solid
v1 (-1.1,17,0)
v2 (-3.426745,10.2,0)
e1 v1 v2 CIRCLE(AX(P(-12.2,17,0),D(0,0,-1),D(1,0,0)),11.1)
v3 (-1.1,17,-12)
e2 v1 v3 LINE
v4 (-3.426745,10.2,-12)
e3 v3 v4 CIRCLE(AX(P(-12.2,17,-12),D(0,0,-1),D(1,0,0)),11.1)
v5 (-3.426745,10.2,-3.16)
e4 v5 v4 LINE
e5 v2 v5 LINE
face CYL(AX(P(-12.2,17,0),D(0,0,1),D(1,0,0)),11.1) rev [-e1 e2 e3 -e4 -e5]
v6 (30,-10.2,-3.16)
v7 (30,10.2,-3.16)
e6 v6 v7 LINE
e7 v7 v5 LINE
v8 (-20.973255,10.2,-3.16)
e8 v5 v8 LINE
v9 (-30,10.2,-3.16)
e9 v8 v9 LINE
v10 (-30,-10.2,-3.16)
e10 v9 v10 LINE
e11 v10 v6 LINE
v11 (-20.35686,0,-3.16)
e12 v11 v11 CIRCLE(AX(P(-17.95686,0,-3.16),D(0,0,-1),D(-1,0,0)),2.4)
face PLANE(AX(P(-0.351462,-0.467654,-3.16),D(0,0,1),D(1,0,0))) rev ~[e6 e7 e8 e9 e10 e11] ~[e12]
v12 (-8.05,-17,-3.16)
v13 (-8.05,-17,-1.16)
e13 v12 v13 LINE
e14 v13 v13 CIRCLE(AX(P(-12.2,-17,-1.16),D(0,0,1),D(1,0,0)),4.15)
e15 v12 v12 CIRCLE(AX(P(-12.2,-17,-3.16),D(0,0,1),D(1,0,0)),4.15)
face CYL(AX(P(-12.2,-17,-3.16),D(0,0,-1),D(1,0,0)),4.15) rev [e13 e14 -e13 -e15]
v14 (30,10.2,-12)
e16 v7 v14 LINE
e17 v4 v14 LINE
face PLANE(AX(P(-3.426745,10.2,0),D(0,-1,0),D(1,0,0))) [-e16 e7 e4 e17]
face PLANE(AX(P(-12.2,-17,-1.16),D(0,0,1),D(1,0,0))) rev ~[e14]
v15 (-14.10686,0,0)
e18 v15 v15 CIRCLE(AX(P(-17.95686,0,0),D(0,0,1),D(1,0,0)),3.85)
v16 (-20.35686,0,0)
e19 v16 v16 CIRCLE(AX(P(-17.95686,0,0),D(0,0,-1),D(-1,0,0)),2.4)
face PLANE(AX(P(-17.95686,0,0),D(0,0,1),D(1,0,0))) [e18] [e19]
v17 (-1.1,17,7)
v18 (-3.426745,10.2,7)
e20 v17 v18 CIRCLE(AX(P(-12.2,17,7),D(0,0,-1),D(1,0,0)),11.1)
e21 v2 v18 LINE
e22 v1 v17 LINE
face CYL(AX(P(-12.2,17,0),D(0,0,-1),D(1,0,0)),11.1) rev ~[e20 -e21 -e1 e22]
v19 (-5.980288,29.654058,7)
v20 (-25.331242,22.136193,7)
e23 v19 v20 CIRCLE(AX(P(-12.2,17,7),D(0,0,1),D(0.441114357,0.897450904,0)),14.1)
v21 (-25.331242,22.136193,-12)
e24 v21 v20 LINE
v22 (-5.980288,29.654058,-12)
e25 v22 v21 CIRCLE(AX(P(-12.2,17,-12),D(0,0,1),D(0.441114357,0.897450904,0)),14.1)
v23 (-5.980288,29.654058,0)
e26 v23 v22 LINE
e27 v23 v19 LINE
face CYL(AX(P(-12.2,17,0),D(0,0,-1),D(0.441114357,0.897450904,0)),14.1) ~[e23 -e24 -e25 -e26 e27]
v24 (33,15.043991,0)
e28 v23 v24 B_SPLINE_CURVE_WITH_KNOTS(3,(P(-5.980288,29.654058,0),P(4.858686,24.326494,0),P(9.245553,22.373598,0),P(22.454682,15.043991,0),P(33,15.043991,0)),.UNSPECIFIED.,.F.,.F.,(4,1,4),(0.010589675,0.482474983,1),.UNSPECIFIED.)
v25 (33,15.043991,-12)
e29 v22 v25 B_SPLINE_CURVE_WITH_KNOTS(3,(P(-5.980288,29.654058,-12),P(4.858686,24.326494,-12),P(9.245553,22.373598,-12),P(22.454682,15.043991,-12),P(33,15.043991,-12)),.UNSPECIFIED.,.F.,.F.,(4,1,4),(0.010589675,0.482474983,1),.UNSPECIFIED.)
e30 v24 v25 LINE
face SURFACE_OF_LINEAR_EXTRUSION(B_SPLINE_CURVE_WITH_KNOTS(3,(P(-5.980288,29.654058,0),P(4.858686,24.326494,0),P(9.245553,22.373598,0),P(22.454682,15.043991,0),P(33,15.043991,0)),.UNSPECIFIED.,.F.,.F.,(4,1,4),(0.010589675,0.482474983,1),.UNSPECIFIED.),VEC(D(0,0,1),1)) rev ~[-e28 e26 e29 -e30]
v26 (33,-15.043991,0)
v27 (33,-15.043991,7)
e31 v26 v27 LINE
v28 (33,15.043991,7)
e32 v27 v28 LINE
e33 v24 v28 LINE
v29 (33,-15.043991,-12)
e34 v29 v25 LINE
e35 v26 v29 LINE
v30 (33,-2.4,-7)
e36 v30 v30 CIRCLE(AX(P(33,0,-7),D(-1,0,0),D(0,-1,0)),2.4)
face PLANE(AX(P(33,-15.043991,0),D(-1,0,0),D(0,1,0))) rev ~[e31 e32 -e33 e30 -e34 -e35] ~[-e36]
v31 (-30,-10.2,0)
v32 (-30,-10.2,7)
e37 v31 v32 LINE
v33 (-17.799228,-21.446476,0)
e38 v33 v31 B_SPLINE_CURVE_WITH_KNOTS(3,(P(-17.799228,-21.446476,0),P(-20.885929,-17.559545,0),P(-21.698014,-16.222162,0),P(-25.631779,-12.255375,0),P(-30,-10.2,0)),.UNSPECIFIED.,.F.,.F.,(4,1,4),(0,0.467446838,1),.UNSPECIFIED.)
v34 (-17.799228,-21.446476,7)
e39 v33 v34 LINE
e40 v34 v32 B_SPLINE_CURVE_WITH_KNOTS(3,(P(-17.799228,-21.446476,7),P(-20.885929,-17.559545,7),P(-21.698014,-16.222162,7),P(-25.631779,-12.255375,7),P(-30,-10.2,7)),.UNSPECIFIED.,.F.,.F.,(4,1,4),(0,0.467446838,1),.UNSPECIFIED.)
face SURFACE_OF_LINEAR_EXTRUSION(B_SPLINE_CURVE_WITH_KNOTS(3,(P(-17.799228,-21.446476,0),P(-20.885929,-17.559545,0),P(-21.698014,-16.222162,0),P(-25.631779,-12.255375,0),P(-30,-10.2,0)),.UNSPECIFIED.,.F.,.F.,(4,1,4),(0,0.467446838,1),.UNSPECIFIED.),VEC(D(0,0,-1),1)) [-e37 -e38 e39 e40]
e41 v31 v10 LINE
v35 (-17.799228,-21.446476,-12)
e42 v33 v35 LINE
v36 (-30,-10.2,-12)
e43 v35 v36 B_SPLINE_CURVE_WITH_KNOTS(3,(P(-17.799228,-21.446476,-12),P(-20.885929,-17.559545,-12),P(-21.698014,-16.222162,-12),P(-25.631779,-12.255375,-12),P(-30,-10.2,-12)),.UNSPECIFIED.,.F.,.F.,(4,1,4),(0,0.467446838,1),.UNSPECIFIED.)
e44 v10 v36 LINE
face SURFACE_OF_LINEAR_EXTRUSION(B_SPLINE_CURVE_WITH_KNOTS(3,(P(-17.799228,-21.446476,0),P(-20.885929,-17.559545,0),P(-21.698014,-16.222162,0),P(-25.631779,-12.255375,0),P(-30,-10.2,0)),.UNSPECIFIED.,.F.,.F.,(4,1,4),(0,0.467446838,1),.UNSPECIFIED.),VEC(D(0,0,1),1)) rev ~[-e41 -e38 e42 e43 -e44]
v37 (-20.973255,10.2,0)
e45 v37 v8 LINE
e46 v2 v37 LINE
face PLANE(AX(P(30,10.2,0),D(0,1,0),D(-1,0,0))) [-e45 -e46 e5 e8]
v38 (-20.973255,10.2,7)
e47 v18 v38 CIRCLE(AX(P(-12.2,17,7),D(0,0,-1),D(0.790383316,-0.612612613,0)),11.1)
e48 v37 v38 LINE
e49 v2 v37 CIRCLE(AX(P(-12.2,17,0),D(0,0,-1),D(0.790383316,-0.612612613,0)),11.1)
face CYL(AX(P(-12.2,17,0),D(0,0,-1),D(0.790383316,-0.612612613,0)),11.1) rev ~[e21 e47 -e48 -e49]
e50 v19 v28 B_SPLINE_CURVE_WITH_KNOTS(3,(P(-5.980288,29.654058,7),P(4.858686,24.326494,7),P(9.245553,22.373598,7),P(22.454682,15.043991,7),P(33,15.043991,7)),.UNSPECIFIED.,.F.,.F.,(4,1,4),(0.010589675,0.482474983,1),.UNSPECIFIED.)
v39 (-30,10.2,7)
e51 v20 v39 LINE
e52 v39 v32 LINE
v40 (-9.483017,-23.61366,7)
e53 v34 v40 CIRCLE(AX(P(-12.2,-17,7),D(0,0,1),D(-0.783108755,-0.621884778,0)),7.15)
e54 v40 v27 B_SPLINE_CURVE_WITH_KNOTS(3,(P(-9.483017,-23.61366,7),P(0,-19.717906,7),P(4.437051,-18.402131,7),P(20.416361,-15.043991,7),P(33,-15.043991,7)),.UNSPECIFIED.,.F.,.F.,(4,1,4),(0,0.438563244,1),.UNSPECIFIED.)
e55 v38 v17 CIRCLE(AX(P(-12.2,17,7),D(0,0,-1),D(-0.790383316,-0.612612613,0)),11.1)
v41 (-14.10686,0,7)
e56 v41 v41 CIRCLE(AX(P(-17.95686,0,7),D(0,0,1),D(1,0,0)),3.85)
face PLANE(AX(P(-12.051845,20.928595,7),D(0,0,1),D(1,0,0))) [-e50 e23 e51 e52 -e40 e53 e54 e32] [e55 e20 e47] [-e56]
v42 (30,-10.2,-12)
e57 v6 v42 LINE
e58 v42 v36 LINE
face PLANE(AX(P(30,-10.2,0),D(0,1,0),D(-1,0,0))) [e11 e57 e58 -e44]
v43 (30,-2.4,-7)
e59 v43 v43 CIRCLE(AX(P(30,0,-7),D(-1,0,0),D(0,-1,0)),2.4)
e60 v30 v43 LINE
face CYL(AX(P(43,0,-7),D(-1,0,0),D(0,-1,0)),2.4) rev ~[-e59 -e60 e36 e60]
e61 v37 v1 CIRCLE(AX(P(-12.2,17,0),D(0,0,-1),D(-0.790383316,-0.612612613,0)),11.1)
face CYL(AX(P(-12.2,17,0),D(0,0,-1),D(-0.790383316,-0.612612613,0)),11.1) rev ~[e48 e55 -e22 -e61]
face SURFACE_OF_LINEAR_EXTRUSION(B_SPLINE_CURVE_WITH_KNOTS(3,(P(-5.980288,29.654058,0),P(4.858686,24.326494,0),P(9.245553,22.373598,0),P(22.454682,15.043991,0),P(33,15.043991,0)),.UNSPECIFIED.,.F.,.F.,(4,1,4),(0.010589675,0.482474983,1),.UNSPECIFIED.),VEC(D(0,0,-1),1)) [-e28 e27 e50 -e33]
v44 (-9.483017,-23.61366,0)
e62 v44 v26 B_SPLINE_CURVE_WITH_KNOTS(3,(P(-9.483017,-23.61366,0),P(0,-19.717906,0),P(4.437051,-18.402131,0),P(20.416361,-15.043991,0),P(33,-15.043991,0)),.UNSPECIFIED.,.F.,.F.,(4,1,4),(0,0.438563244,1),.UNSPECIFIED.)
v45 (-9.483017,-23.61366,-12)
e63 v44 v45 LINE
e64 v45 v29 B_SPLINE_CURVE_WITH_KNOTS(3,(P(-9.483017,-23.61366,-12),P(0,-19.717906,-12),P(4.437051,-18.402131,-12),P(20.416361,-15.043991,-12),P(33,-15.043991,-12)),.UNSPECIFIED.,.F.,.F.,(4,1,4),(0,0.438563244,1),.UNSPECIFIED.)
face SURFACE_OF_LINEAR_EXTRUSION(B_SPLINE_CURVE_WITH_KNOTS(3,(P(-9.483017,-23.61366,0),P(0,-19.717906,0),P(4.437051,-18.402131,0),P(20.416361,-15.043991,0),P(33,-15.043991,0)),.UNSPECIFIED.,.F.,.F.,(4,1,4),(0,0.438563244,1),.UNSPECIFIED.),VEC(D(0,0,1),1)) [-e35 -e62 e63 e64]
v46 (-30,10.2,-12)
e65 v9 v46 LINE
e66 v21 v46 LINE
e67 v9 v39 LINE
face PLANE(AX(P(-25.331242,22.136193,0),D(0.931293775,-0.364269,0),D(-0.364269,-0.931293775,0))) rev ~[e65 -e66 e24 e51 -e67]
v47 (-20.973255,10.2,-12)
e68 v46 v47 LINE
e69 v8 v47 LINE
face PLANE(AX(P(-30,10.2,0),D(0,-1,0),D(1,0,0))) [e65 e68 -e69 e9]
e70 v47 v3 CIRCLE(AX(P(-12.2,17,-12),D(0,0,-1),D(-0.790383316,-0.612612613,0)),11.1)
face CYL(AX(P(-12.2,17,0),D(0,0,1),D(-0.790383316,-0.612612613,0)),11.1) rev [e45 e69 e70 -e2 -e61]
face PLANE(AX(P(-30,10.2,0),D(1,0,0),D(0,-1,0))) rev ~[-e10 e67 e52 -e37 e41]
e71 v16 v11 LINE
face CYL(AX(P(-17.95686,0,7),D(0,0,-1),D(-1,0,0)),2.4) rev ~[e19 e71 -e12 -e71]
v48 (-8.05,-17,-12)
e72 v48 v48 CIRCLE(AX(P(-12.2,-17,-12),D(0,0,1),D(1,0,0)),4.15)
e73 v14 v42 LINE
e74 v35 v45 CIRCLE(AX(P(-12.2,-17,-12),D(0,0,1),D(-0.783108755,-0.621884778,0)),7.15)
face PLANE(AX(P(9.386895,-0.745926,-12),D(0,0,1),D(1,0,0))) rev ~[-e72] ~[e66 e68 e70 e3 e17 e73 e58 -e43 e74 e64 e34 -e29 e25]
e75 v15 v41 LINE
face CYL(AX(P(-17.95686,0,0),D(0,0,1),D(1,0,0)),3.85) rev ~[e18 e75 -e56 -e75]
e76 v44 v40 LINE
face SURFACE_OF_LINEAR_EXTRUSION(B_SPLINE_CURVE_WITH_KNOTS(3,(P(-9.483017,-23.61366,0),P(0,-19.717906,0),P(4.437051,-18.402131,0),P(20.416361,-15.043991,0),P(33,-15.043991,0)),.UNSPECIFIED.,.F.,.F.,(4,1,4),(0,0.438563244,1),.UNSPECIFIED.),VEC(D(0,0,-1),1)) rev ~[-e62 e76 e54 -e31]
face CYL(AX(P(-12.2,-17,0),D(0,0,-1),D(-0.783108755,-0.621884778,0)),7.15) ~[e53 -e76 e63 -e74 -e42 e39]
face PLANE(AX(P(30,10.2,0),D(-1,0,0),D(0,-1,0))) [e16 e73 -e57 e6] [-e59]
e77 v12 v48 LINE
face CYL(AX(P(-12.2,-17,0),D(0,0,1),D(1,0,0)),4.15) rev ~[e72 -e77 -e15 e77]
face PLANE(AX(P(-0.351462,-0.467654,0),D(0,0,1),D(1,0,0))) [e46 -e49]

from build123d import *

# Parameters (mm, degrees)
F0_R           = 4.15
F1_DEPTH       = 12
F2_DEPTH       = 3.16
F3_DEPTH       = 7
F6_D           = 4.8
F6_DEPTH       = 15
F6_CBORE_D     = 7.7
F6_CBORE_DEPTH = 7
F6_TIP         = 1.4420654857
F7_D           = 4.8
F7_DEPTH       = 10
F7_TIP         = 1.4420654857
F8_DEPTH       = 2


# Not quite as in the source:
# - after a boolean that leaves OpenCascade's solid faulty, fix() repairs it


with BuildPart() as f1:
    # F0 (on Top) → F1 (new body)
    with BuildSketch(Plane.XY):
        with BuildLine():
            Line((30, 10.2), (30, -10.2))
            Line((30, -10.2), (-30, -10.2))
            add(Edge.make_bspline(
                [(-17.7992275989, -21.4464761661), (-20.8859294653, -17.5595451146), (-21.6980138001, -16.2221621605), (-25.6317793117, -12.2553748449), (-30, -10.2)],
                knots=[0, 0, 0, 0, 0.4674468376, 1, 1, 1, 1], degree=3))
            ThreePointArc((-17.7992275989, -21.4464761661), (-14.003054565, -23.9189229101), (-9.4830172376, -23.6136604591))
            add(Edge.make_bspline(
                [(-9.4830172376, -23.6136604591), (0, -19.7179064316), (4.4370511503, -18.4021307002), (20.4163611322, -15.0439910263), (33, -15.0439910263)],
                knots=[0, 0, 0, 0, 0.4385632438, 1, 1, 1, 1], degree=3))
            Line((33, -15.0439910263), (33, 15.0439910263))
            add(Edge.make_bspline(
                [(-5.9802875731, 29.6540577416), (4.8586864574, 24.3264938357), (9.2455528778, 22.3735984932), (22.4546817712, 15.0439910263), (33, 15.0439910263)],
                knots=[0.0105896754, 0.0105896754, 0.0105896754, 0.0105896754, 0.4824749826, 1, 1, 1, 1], degree=3))
            ThreePointArc((-5.9802875731, 29.6540577416), (-0.2311248394, 24.4535915766), (1.9, 17))
            ThreePointArc((1.9, 17), (1.4559897714, 13.4894525551), (0.1519229272, 10.2))
            Line((0.1519229272, 10.2), (30, 10.2))
        make_face()
        with Locations((-12.2, -17)):
            Circle(F0_R, mode=Mode.SUBTRACT)
        with BuildLine():
            Line((-3.4267451878, 10.2), (0.1519229272, 10.2))
            ThreePointArc((0.1519229272, 10.2), (1.4559897714, 13.4894525551), (1.9, 17))
            ThreePointArc((1.9, 17), (-0.2311248394, 24.4535915766), (-5.9802875731, 29.6540577416))
            ThreePointArc((-5.9802875731, 29.6540577416), (-17.3060634553, 30.1429873313), (-25.3312422306, 22.1361928977))
            ThreePointArc((-25.3312422306, 22.1361928977), (-26.2700427092, 16.0813607005), (-24.5519229272, 10.2))
            Line((-24.5519229272, 10.2), (-20.9732548122, 10.2))
            ThreePointArc((-20.9732548122, 10.2), (-15.7935269294, 27.5022171092), (-1.1, 17))
            ThreePointArc((-1.1, 17), (-1.6977828908, 13.4064730706), (-3.4267451878, 10.2))
        make_face()
        with BuildLine():
            Line((-25.3312422306, 22.1361928977), (-30, 10.2))
            Line((-30, 10.2), (-24.5519229272, 10.2))
            ThreePointArc((-24.5519229272, 10.2), (-26.2700427092, 16.0813607005), (-25.3312422306, 22.1361928977))
        make_face()
    extrude(amount=-F1_DEPTH)

    # F0 (on Top) → F2 (join)
    with BuildSketch(Plane.XY):
        with BuildLine():
            Line((-30, -10.2), (30, -10.2))
            Line((30, -10.2), (30, 10.2))
            Line((30, 10.2), (0.1519229272, 10.2))
            ThreePointArc((0.1519229272, 10.2), (-12.2, 2.9), (-24.5519229272, 10.2))
            Line((-24.5519229272, 10.2), (-30, 10.2))
            Line((-30, 10.2), (-30, -10.2))
        make_face()
        with BuildLine():
            ThreePointArc((-24.5519229272, 10.2), (-12.2, 2.9), (0.1519229272, 10.2))
            Line((0.1519229272, 10.2), (-3.4267451878, 10.2))
            ThreePointArc((-3.4267451878, 10.2), (-12.2, 5.9), (-20.9732548122, 10.2))
            Line((-20.9732548122, 10.2), (-24.5519229272, 10.2))
        make_face()
        with BuildLine():
            ThreePointArc((-20.9732548122, 10.2), (-12.2, 5.9), (-3.4267451878, 10.2))
            Line((-3.4267451878, 10.2), (-20.9732548122, 10.2))
        make_face()
        with Locations((-12.2, -17)):
            Circle(F0_R)
    extrude(amount=-F2_DEPTH)

    # F0 (on Top) → F3 (join)
    with BuildSketch(Plane.XY):
        with BuildLine():
            Line((-3.4267451878, 10.2), (0.1519229272, 10.2))
            ThreePointArc((0.1519229272, 10.2), (1.4559897714, 13.4894525551), (1.9, 17))
            ThreePointArc((1.9, 17), (-0.2311248394, 24.4535915766), (-5.9802875731, 29.6540577416))
            ThreePointArc((-5.9802875731, 29.6540577416), (-17.3060634553, 30.1429873313), (-25.3312422306, 22.1361928977))
            ThreePointArc((-25.3312422306, 22.1361928977), (-26.2700427092, 16.0813607005), (-24.5519229272, 10.2))
            Line((-24.5519229272, 10.2), (-20.9732548122, 10.2))
            ThreePointArc((-20.9732548122, 10.2), (-15.7935269294, 27.5022171092), (-1.1, 17))
            ThreePointArc((-1.1, 17), (-1.6977828908, 13.4064730706), (-3.4267451878, 10.2))
        make_face()
        with BuildLine():
            ThreePointArc((-24.5519229272, 10.2), (-12.2, 2.9), (0.1519229272, 10.2))
            Line((0.1519229272, 10.2), (-3.4267451878, 10.2))
            ThreePointArc((-3.4267451878, 10.2), (-12.2, 5.9), (-20.9732548122, 10.2))
            Line((-20.9732548122, 10.2), (-24.5519229272, 10.2))
        make_face()
        with BuildLine():
            Line((30, 10.2), (30, -10.2))
            Line((30, -10.2), (-30, -10.2))
            add(Edge.make_bspline(
                [(-17.7992275989, -21.4464761661), (-20.8859294653, -17.5595451146), (-21.6980138001, -16.2221621605), (-25.6317793117, -12.2553748449), (-30, -10.2)],
                knots=[0, 0, 0, 0, 0.4674468376, 1, 1, 1, 1], degree=3))
            ThreePointArc((-17.7992275989, -21.4464761661), (-14.003054565, -23.9189229101), (-9.4830172376, -23.6136604591))
            add(Edge.make_bspline(
                [(-9.4830172376, -23.6136604591), (0, -19.7179064316), (4.4370511503, -18.4021307002), (20.4163611322, -15.0439910263), (33, -15.0439910263)],
                knots=[0, 0, 0, 0, 0.4385632438, 1, 1, 1, 1], degree=3))
            Line((33, -15.0439910263), (33, 15.0439910263))
            add(Edge.make_bspline(
                [(-5.9802875731, 29.6540577416), (4.8586864574, 24.3264938357), (9.2455528778, 22.3735984932), (22.4546817712, 15.0439910263), (33, 15.0439910263)],
                knots=[0.0105896754, 0.0105896754, 0.0105896754, 0.0105896754, 0.4824749826, 1, 1, 1, 1], degree=3))
            ThreePointArc((-5.9802875731, 29.6540577416), (-0.2311248394, 24.4535915766), (1.9, 17))
            ThreePointArc((1.9, 17), (1.4559897714, 13.4894525551), (0.1519229272, 10.2))
            Line((0.1519229272, 10.2), (30, 10.2))
        make_face()
        with Locations((-12.2, -17)):
            Circle(F0_R, mode=Mode.SUBTRACT)
        with BuildLine():
            Line((-30, -10.2), (30, -10.2))
            Line((30, -10.2), (30, 10.2))
            Line((30, 10.2), (0.1519229272, 10.2))
            ThreePointArc((0.1519229272, 10.2), (-12.2, 2.9), (-24.5519229272, 10.2))
            Line((-24.5519229272, 10.2), (-30, 10.2))
            Line((-30, 10.2), (-30, -10.2))
        make_face()
        with BuildLine():
            Line((-25.3312422306, 22.1361928977), (-30, 10.2))
            Line((-30, 10.2), (-24.5519229272, 10.2))
            ThreePointArc((-24.5519229272, 10.2), (-26.2700427092, 16.0813607005), (-25.3312422306, 22.1361928977))
        make_face()
        with Locations((-12.2, -17)):
            Circle(F0_R)
    extrude(amount=F3_DEPTH)

    # F6
    with Locations(Plane.XY.offset(7)):
        with Locations((-17.9568603635, 0)):
            CounterBoreHole(F6_D / 2, F6_CBORE_D / 2, F6_CBORE_DEPTH, depth=F6_DEPTH)
            with Locations((0, 0, -(F6_DEPTH + F6_TIP / 2))):  # 118° drill point
                Cone(0, F6_D / 2, F6_TIP, mode=Mode.SUBTRACT)

    # F7
    with Locations(Plane.YZ.offset(33)):
        with Locations((0, -7)):
            Hole(F7_D / 2, depth=F7_DEPTH)
            with Locations((0, 0, -(F7_DEPTH + F7_TIP / 2))):  # 118° drill point
                Cone(0, F7_D / 2, F7_TIP, mode=Mode.SUBTRACT)

    add(f1.part.fix(), mode=Mode.REPLACE)

    # F8 (cut): a face of the model
    f8_faces = [f1.faces().sort_by_distance(p)[0] for p in [
        (-12.2, -17, -3.16),
    ]]
    extrude(f8_faces, amount=-F8_DEPTH, mode=Mode.SUBTRACT)


solid = f1.part
